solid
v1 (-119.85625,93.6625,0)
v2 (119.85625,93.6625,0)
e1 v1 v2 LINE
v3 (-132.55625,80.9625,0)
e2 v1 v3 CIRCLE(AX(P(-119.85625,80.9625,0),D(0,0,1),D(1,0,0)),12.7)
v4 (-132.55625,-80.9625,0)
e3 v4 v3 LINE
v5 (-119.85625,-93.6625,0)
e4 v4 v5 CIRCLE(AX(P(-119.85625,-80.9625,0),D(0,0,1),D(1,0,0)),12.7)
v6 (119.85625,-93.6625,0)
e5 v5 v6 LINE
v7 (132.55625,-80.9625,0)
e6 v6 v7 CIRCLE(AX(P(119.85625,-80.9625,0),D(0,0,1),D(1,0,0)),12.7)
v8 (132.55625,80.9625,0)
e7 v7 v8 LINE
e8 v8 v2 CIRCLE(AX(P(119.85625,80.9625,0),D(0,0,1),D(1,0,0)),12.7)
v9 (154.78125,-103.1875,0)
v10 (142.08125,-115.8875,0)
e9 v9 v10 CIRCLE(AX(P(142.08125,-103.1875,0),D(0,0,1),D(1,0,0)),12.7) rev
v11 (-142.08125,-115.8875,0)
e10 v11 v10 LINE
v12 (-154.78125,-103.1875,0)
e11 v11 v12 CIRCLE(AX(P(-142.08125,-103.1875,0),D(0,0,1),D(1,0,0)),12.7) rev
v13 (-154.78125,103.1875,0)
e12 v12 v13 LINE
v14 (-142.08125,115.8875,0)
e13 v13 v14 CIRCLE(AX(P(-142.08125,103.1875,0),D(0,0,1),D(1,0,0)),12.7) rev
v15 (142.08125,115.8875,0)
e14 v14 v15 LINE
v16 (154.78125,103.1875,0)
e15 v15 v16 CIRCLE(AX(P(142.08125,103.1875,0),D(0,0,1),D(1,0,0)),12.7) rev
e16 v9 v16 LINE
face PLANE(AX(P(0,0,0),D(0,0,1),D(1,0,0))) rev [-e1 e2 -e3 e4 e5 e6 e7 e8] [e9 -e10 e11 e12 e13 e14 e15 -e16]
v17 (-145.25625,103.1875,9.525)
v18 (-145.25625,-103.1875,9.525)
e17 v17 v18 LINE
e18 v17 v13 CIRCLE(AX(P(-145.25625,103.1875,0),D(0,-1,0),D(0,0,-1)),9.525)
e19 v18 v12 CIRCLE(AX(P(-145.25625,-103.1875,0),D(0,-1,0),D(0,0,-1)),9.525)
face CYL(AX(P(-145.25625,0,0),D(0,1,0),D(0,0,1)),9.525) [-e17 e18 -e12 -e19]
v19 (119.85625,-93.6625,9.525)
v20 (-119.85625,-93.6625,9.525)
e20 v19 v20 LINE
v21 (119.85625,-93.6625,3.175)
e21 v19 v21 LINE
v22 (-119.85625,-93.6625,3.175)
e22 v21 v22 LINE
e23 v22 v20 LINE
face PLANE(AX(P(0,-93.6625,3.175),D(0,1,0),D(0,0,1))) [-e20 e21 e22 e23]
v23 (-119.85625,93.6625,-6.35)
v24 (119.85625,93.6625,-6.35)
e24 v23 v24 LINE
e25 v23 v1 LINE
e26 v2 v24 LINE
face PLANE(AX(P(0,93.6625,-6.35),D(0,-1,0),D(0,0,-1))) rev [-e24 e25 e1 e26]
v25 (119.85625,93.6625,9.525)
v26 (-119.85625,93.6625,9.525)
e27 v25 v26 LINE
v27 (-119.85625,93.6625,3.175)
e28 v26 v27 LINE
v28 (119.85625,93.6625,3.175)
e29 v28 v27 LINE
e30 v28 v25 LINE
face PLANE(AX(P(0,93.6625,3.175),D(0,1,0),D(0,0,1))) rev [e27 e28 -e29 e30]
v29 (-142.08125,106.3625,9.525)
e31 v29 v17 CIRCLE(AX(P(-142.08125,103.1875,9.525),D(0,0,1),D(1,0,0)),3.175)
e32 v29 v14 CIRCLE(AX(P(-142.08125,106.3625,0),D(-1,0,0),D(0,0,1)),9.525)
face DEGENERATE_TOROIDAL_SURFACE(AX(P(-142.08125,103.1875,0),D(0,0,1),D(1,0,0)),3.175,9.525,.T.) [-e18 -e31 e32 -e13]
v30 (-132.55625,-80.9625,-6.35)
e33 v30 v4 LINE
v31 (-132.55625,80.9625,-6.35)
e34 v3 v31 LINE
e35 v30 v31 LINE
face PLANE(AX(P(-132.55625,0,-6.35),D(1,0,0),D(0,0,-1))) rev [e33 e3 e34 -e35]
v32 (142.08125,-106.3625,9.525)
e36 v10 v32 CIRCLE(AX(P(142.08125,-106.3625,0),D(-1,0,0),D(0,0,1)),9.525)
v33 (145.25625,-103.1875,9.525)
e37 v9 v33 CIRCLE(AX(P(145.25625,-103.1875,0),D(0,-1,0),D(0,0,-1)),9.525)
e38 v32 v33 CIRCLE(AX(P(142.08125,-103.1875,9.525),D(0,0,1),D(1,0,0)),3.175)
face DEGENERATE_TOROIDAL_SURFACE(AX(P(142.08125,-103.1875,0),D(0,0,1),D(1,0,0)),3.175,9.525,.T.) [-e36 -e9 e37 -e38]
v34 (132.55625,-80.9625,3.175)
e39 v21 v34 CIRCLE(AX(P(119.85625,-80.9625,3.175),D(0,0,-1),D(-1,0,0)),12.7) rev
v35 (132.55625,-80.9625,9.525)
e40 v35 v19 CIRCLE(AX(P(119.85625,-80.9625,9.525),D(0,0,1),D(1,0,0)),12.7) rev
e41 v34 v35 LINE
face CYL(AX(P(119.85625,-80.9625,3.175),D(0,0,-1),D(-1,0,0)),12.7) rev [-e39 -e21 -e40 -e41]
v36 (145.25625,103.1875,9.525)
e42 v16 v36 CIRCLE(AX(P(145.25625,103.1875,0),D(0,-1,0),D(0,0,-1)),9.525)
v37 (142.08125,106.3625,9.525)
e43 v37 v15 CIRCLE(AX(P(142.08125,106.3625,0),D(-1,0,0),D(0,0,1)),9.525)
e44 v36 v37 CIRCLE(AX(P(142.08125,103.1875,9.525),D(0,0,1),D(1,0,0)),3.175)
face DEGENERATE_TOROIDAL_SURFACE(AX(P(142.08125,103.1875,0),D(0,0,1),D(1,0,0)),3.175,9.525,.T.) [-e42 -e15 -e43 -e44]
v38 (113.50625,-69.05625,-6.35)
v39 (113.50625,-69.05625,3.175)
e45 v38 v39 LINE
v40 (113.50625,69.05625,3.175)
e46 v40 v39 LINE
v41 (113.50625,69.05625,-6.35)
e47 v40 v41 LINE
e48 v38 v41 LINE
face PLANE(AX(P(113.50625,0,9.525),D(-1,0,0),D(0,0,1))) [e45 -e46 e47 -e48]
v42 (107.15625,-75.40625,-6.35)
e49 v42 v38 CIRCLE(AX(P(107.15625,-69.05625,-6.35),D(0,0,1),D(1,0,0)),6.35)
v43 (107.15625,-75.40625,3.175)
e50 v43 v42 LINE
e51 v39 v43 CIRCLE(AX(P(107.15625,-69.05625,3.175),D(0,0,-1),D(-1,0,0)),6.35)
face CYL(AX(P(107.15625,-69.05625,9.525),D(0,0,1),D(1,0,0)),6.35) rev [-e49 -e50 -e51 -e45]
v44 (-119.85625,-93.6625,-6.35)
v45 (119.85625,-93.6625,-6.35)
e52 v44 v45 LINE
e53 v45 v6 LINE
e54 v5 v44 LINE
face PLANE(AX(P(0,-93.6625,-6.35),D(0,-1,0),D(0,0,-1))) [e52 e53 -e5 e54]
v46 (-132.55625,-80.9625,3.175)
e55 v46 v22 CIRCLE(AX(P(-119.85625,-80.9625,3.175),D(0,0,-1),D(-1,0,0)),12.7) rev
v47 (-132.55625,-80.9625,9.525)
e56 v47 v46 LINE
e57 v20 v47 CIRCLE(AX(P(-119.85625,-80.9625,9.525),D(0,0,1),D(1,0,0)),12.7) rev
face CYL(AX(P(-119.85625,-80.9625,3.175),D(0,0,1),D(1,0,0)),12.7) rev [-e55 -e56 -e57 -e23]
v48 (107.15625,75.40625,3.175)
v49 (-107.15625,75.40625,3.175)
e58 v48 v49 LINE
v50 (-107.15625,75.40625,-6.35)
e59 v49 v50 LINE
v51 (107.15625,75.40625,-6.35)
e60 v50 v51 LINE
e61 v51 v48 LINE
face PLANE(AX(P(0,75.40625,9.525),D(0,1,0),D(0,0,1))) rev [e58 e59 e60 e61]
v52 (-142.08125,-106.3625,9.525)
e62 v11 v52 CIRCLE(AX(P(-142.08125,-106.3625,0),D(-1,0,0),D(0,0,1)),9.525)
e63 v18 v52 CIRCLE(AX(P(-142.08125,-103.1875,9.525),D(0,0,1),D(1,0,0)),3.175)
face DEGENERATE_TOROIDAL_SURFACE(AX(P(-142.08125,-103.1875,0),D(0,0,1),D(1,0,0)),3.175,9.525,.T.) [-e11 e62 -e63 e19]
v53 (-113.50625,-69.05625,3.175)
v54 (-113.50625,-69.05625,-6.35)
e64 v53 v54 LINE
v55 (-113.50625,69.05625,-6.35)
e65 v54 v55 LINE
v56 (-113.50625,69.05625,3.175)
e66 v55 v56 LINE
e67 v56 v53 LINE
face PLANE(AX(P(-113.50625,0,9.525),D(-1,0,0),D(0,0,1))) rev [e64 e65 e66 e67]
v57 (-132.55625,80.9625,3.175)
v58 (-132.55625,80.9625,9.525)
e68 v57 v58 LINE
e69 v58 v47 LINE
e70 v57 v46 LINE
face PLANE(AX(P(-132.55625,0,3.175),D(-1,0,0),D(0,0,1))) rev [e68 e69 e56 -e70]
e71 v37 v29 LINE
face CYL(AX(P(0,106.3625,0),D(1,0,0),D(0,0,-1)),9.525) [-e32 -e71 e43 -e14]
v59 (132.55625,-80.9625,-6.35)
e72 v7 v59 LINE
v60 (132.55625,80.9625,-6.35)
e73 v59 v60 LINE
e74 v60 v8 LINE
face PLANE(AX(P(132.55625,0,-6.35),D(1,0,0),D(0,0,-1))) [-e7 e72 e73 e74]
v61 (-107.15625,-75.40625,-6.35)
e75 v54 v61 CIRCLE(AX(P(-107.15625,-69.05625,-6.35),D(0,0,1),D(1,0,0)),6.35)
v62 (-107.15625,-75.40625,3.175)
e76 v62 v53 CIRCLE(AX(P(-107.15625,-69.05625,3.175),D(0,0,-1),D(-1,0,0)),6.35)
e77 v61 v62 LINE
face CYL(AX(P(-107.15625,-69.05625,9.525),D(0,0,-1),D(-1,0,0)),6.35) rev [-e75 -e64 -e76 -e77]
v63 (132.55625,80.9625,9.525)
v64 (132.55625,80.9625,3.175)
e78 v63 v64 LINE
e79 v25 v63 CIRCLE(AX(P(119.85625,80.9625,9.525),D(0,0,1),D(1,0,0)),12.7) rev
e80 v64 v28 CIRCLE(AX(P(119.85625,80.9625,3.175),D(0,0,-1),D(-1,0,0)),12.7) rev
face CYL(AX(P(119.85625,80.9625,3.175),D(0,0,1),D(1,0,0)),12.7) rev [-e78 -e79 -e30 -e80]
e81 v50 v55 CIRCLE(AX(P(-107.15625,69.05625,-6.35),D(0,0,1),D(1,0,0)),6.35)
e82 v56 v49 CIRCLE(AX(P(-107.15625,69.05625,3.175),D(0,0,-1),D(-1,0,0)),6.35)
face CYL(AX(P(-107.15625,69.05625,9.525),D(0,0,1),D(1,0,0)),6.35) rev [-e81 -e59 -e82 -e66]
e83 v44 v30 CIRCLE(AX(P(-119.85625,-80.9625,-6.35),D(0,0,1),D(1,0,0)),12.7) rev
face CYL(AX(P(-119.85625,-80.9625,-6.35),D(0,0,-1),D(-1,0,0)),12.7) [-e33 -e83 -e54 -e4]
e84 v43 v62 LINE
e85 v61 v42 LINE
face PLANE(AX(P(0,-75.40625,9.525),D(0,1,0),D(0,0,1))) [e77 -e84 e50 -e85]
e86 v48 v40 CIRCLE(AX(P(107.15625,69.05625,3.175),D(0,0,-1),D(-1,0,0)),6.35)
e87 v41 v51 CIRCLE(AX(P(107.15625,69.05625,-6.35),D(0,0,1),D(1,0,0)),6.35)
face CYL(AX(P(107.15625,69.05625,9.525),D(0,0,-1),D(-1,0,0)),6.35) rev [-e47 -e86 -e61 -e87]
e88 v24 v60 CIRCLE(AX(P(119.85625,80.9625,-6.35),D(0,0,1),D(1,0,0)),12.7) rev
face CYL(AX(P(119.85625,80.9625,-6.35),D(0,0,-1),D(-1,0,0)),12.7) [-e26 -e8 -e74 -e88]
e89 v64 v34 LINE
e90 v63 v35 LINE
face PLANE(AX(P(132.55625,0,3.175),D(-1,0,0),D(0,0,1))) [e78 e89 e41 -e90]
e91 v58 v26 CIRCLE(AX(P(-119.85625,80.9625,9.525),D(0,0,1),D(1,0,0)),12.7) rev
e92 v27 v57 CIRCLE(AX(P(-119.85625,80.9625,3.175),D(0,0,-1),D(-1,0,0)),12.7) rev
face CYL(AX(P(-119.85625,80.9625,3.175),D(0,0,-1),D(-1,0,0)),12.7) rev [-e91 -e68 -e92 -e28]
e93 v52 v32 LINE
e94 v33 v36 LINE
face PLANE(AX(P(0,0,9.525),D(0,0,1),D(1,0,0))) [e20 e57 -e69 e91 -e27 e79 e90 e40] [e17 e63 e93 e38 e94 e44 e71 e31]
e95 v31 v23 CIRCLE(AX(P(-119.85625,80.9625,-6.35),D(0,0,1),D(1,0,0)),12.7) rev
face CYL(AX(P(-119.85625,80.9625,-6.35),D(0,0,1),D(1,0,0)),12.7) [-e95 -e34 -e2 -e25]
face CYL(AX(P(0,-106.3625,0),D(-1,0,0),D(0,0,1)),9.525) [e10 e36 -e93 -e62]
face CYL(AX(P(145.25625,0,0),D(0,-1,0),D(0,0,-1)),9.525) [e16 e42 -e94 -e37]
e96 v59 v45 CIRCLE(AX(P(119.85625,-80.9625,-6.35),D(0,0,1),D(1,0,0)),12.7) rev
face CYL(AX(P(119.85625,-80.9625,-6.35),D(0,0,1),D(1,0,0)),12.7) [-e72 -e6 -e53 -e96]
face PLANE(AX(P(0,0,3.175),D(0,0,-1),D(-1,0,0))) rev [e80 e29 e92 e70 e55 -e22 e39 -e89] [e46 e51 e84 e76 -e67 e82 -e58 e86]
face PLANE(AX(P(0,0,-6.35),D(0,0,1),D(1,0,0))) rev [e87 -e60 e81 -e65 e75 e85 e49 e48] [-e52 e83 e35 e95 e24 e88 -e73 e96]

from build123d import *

# Parameters (mm, degrees)
SKETCH1_W           = 309.5625
SKETCH1_H           = 231.775
SKETCH1_W_2         = 265.1125
SKETCH1_H_2         = 187.325
SKETCH1_W_3         = 227.0125
SKETCH1_H_3         = 150.8125
BOSS_EXTRUDE1_DEPTH = 9.525
SKETCH1_3_W         = 265.1125
SKETCH1_3_H         = 187.325
SKETCH1_3_W_2       = 227.0125
SKETCH1_3_H_2       = 150.8125
BOSS_EXTRUDE2_DEPTH = 6.35
FILLET1_R           = 12.7
CUT_EXTRUDE1_START  = 9.525
SKETCH1_4_W         = 265.1125
SKETCH1_4_H         = 187.325
SKETCH1_4_W_2       = 227.0125
SKETCH1_4_H_2       = 150.8125
CUT_EXTRUDE1_DEPTH  = 6.35
FILLET2_R           = 6.35
FILLET3_R           = 12.7
FILLET4_R           = 9.525


with BuildPart() as part:
    # Sketch1 → Boss-Extrude1 (new body)
    # profile 1 of 2: a face of its own
    with BuildSketch(Plane.XY):
        Rectangle(SKETCH1_W, SKETCH1_H)
        Rectangle(SKETCH1_W_2, SKETCH1_H_2, mode=Mode.SUBTRACT)
    # profile 2 of 2: a face of its own
    with BuildSketch(Plane.XY):
        Rectangle(SKETCH1_W_2, SKETCH1_H_2)
        Rectangle(SKETCH1_W_3, SKETCH1_H_3, mode=Mode.SUBTRACT)
    extrude(amount=BOSS_EXTRUDE1_DEPTH)

    # Sketch1<3> → Boss-Extrude2 (add)
    with BuildSketch(Plane.XY):
        Rectangle(SKETCH1_3_W, SKETCH1_3_H)
        Rectangle(SKETCH1_3_W_2, SKETCH1_3_H_2, mode=Mode.SUBTRACT)
    extrude(amount=-BOSS_EXTRUDE2_DEPTH)

    # Fillet1
    fillet1_edges = [part.edges().sort_by_distance(p)[0] for p in [
        (-154.78125, -115.8875, 4.7625),
        (-154.78125, 115.8875, 4.7625),
        (154.78125, 115.8875, 4.7625),
        (154.78125, -115.8875, 4.7625),
        (132.55625, -93.6625, -3.175),
        (-132.55625, -93.6625, -3.175),
        (-132.55625, 93.6625, -3.175),
        (132.55625, 93.6625, -3.175),
    ]]
    fillet(fillet1_edges, radius=FILLET1_R)

    # Sketch1<4> → Cut-Extrude1 (cut)
    with BuildSketch(Plane.XY.offset(CUT_EXTRUDE1_START)):
        Rectangle(SKETCH1_4_W, SKETCH1_4_H)
        Rectangle(SKETCH1_4_W_2, SKETCH1_4_H_2, mode=Mode.SUBTRACT)
    extrude(amount=-CUT_EXTRUDE1_DEPTH, mode=Mode.SUBTRACT)

    # Fillet2
    fillet2_edges = [part.edges().sort_by_distance(p)[0] for p in [
        (-113.50625, 75.40625, -1.5875),
        (113.50625, 75.40625, -1.5875),
        (-113.50625, -75.40625, -1.5875),
        (113.50625, -75.40625, -1.5875),
    ]]
    fillet(fillet2_edges, radius=FILLET2_R)

    # Fillet3
    fillet3_edges = [part.edges().sort_by_distance(p)[0] for p in [
        (-132.55625, -93.6625, 6.35),
        (-132.55625, 93.6625, 6.35),
        (132.55625, 93.6625, 6.35),
        (132.55625, -93.6625, 6.35),
    ]]
    fillet(fillet3_edges, radius=FILLET3_R)

    # Fillet4
    fillet4_edges = [part.edges().sort_by_distance(p)[0] for p in [
        (-151.061506121, -112.167756121, 9.525),
        (0, -115.8875, 9.525),
        (151.061506121, -112.167756121, 9.525),
        (154.78125, 0, 9.525),
        (151.061506121, 112.167756121, 9.525),
        (0, 115.8875, 9.525),
        (-151.061506121, 112.167756121, 9.525),
        (-154.78125, 0, 9.525),
    ]]
    fillet(fillet4_edges, radius=FILLET4_R - 0.0001)  # a hair under: the kernel refuses the full size


solid = part.part
